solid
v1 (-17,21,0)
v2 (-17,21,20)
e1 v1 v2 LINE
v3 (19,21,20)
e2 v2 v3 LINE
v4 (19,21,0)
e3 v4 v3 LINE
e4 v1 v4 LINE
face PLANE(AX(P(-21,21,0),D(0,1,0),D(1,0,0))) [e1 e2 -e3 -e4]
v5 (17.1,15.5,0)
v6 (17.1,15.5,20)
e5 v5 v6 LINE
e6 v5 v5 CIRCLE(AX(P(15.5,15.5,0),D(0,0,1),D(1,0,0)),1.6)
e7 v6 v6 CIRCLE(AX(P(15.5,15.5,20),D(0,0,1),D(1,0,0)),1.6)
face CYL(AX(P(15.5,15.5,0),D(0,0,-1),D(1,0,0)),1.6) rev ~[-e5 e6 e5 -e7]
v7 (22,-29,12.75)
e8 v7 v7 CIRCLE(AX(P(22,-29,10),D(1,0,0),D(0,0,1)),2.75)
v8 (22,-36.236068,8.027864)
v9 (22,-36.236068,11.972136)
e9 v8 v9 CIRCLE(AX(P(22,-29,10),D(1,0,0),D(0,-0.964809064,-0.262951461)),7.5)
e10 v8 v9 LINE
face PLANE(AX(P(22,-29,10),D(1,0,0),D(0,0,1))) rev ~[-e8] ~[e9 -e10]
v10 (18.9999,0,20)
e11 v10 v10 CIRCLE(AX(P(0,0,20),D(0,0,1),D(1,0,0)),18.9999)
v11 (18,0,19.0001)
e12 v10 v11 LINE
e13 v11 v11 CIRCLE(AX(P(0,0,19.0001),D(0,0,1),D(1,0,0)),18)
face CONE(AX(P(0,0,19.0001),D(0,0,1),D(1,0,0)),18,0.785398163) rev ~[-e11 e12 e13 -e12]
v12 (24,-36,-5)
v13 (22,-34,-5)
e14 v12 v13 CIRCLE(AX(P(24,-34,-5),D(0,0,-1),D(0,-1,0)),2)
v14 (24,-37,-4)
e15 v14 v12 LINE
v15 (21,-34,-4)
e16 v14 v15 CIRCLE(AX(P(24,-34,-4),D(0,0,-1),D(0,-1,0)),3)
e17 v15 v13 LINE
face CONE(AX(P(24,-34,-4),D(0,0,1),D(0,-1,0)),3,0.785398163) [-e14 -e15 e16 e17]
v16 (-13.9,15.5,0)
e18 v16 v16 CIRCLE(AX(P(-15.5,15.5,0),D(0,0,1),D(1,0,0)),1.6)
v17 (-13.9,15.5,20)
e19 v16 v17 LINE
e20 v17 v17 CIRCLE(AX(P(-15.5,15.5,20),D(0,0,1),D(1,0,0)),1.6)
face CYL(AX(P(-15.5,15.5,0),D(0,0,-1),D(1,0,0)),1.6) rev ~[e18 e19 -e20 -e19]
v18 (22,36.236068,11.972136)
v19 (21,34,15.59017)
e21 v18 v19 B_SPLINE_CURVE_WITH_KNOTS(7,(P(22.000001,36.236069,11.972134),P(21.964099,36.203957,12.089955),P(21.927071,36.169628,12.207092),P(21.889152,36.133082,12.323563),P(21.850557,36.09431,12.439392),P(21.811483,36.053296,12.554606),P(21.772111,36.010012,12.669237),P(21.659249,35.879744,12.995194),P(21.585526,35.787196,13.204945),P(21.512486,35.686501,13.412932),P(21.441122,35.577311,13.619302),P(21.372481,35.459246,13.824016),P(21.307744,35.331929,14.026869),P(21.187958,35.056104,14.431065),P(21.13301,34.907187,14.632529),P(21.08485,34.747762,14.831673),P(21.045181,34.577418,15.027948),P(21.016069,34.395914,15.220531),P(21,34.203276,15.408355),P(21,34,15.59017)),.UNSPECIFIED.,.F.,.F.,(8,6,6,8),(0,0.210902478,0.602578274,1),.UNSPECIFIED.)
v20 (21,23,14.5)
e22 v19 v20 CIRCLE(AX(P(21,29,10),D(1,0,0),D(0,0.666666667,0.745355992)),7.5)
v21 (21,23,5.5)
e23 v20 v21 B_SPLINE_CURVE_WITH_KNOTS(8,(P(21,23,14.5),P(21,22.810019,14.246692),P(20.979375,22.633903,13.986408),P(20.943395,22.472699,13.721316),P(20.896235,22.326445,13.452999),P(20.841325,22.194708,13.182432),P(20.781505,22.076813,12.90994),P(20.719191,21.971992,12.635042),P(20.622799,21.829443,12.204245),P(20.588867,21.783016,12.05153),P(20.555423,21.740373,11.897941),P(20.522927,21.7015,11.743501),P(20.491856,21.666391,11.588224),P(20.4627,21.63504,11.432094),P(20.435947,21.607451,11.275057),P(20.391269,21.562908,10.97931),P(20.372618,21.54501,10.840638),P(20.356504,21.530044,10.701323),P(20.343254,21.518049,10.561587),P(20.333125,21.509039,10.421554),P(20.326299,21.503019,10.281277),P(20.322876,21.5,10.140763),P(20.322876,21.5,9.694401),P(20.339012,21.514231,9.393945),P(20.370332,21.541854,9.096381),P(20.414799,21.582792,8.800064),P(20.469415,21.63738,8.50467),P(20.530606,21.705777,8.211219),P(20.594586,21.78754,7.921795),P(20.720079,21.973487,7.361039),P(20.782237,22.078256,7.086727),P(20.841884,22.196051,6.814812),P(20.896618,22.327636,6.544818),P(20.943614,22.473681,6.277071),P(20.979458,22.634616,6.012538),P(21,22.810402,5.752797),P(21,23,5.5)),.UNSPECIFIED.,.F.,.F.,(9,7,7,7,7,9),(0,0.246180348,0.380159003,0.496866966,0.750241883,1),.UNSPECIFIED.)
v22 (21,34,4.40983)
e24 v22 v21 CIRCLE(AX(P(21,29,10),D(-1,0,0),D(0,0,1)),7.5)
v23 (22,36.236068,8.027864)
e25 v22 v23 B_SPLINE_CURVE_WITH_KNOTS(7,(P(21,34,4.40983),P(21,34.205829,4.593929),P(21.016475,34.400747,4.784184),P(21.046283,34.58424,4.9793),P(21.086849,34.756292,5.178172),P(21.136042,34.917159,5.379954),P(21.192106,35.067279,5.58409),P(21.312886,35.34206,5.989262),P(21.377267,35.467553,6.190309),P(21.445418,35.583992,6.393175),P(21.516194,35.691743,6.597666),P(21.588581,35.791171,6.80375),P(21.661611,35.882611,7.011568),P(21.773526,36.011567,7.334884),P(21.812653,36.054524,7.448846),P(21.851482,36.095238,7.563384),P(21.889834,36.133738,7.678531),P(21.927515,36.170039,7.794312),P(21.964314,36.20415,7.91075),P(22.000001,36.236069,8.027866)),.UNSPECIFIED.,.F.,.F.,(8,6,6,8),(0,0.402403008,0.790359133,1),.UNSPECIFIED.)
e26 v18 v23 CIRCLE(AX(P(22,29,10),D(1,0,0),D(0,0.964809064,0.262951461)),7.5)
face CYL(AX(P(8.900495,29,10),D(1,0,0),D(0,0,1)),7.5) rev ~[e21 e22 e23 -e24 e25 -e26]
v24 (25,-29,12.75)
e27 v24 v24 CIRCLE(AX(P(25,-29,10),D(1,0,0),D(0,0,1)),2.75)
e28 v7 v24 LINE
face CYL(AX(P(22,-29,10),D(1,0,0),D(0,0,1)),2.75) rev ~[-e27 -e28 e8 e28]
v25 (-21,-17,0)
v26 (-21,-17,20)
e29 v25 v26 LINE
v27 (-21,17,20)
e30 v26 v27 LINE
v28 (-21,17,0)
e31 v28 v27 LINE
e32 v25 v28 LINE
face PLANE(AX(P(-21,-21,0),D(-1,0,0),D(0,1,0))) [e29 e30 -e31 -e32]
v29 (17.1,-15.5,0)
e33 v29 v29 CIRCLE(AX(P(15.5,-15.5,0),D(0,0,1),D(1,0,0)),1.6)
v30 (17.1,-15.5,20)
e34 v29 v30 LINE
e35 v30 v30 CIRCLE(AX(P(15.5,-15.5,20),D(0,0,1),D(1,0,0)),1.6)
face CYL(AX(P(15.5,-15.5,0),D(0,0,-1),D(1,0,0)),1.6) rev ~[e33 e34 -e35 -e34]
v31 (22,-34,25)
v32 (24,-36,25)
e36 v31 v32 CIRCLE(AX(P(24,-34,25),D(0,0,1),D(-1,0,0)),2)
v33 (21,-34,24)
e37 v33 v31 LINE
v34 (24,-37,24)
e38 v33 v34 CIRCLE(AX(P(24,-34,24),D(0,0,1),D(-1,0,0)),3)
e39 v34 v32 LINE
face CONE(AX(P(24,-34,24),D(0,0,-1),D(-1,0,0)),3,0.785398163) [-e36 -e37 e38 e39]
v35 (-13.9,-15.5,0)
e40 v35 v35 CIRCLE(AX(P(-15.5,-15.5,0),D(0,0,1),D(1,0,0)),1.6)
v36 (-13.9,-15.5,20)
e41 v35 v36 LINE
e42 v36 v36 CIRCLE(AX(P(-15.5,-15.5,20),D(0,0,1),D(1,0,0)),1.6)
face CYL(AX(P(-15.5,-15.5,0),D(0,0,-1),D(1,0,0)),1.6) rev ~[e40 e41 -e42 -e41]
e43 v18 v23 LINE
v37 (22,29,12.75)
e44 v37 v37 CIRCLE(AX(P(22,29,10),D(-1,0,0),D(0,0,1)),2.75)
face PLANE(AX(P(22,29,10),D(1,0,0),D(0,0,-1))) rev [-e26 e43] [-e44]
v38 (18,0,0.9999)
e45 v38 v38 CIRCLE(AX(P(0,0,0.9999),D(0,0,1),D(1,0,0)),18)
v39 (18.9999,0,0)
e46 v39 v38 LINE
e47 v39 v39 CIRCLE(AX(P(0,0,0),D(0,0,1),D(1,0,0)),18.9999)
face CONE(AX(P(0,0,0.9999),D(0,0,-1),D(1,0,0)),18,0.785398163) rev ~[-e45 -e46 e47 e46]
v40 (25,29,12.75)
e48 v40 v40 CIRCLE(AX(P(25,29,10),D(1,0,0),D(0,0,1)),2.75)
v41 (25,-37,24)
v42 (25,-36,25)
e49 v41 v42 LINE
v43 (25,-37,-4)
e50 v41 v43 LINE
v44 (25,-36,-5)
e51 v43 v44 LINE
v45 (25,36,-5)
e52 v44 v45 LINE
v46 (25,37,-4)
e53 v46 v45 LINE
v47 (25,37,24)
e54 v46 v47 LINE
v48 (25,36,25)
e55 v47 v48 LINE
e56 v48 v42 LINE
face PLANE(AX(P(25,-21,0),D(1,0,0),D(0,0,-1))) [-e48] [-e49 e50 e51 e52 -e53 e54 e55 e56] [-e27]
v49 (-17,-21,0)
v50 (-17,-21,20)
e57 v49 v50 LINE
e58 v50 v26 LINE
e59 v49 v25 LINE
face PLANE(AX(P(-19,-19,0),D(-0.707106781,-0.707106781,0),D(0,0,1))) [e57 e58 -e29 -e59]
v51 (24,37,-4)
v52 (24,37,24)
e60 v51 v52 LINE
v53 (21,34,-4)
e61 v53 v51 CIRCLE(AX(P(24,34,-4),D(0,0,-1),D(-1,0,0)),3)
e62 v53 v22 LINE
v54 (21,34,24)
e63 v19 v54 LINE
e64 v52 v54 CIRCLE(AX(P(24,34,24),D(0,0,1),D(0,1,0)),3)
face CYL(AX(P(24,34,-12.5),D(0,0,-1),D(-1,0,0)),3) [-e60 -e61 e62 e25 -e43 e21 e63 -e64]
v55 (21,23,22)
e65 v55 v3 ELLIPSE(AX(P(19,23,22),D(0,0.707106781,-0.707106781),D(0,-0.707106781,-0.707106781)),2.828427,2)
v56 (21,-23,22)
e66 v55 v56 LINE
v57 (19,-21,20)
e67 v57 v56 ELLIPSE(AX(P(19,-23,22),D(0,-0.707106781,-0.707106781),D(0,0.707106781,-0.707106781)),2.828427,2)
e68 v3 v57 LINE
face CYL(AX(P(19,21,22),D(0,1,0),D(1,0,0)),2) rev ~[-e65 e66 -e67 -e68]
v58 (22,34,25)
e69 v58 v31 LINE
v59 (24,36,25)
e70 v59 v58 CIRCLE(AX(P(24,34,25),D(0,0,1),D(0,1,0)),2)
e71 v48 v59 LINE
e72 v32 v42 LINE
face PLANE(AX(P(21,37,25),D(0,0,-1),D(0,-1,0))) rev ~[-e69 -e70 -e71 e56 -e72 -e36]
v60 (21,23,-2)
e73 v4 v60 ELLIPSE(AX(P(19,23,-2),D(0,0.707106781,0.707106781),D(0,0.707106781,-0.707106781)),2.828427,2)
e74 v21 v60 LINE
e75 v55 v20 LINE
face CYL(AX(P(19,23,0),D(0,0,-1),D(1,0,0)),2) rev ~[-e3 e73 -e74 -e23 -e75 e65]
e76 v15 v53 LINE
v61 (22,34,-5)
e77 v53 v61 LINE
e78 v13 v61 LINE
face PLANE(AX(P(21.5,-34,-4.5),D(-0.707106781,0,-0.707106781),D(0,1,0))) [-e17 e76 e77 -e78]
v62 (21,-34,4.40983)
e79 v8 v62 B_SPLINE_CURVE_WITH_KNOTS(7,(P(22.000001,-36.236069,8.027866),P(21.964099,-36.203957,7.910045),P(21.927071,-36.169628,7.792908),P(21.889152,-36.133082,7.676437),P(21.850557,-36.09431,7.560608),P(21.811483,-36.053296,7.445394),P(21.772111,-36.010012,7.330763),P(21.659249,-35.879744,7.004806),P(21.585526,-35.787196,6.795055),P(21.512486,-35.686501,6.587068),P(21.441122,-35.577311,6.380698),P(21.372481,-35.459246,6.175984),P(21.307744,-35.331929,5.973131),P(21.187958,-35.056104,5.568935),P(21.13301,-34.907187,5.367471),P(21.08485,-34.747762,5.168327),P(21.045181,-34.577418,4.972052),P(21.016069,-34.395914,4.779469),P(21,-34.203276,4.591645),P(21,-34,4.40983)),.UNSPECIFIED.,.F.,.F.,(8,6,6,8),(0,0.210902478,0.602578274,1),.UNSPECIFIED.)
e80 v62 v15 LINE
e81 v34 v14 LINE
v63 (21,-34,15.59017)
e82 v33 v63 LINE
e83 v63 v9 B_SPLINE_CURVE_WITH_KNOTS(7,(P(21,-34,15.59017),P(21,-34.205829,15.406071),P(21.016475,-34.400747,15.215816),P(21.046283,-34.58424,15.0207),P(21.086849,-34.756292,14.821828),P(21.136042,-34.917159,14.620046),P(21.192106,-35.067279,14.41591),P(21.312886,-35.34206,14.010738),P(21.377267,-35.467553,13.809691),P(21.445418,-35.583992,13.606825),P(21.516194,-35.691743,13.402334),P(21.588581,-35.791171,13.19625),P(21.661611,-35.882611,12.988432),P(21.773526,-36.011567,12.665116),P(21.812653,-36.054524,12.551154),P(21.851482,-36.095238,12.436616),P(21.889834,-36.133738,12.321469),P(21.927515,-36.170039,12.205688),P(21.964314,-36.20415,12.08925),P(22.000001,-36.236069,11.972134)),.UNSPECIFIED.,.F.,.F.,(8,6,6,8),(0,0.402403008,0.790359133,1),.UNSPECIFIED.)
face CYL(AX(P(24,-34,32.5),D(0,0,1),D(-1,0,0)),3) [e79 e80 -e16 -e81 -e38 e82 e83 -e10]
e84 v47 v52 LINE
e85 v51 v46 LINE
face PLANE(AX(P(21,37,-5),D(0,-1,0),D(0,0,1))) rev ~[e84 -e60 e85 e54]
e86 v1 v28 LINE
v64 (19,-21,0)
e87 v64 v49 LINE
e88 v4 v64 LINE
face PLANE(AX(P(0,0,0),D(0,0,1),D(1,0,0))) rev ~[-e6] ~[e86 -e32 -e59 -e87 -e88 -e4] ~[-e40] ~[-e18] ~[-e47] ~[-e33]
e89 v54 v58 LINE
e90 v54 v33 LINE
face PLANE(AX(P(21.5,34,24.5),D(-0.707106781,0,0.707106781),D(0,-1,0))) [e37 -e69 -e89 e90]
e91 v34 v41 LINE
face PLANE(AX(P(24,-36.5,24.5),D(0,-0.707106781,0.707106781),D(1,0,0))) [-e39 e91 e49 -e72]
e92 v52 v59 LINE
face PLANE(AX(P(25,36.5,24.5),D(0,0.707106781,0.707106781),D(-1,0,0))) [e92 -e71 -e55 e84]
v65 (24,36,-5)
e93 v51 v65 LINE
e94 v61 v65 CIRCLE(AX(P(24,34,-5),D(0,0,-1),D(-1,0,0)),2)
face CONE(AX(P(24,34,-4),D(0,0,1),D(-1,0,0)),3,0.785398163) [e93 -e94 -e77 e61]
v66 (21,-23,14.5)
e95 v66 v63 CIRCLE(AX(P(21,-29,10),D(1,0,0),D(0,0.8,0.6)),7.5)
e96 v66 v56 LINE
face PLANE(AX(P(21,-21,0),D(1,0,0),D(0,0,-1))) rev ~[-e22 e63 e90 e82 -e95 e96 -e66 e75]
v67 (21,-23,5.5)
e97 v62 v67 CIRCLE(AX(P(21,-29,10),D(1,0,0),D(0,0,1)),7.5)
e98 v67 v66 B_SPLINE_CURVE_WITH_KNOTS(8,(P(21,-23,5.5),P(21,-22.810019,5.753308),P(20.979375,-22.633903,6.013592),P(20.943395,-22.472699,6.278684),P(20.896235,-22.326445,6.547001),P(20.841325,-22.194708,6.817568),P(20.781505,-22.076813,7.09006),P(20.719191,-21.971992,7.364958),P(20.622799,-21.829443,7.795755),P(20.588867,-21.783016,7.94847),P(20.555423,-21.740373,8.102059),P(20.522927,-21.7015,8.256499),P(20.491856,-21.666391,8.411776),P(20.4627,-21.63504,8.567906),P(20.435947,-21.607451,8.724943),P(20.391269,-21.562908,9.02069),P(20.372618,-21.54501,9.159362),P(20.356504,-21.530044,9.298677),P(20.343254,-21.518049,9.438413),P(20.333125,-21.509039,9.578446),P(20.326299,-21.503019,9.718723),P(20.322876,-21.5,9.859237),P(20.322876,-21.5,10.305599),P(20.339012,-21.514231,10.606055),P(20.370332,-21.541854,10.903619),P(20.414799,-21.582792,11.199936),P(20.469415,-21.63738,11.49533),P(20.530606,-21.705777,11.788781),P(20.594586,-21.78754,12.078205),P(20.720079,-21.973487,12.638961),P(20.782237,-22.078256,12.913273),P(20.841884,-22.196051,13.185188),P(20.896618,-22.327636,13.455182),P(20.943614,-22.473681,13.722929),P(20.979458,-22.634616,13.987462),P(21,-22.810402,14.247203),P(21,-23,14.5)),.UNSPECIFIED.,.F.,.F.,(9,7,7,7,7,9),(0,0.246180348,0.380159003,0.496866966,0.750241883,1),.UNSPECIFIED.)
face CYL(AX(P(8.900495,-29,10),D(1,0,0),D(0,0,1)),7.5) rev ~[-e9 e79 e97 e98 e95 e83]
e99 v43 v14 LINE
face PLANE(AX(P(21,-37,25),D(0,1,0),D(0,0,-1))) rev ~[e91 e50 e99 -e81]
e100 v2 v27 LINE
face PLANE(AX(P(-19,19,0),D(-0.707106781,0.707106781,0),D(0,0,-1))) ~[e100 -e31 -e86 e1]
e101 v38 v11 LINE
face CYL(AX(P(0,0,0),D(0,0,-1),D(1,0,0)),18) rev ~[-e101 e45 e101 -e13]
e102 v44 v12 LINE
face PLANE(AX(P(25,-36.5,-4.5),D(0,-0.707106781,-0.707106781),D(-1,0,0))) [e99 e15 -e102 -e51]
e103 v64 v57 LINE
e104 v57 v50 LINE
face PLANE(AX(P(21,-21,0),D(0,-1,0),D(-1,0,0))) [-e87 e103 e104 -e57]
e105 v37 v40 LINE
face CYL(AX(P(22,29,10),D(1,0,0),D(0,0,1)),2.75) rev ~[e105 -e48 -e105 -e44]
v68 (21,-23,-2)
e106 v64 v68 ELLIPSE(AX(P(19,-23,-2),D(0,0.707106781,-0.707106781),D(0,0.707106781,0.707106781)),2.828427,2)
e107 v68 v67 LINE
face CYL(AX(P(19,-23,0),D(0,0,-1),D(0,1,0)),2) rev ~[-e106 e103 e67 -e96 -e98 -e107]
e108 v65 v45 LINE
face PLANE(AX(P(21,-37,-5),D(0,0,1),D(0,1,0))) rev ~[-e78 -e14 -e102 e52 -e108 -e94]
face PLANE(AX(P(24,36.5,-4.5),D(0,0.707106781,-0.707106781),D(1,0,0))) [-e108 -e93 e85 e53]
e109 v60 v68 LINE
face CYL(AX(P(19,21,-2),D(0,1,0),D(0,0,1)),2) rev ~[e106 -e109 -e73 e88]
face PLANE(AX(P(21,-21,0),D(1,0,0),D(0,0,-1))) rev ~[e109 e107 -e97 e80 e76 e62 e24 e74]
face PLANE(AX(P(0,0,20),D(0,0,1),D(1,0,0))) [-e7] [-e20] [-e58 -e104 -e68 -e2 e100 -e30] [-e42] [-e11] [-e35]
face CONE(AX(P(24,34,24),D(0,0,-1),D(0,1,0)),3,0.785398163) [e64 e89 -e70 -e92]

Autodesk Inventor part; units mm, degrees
ref_plane "YZ Plane" through (0, 0, 0) normal (1, 0, 0) x (0, 1, 0)
ref_plane "XZ Plane" through (0, 0, 0) normal (0, 1, 0) x (-1, 0, 0)
ref_plane "XY Plane" through (0, 0, 0) normal (0, 0, 1) x (1, 0, 0)
sketch "Skizze1" plane through (0, 0, 0) normal (0, 0, 1) x (1, 0, 0)
  line L0 (21, -21) -> (-21, -21)
  line L1 (-21, -21) -> (-21, 21)
  line L2 (-21, 21) -> (21, 21)
  line L3 (21, 21) -> (21, -21)
  line L4 (21, -21) -> (-21, 21) construction
  line L5 (-21, -21) -> (21, 21) construction
  circle A0 centre (0, 0) radius 18
  circle A1 centre (-15.5, 15.5) radius 1.6
  circle A2 centre (15.5, 15.5) radius 1.6
  circle A3 centre (15.5, -15.5) radius 1.6
  circle A4 centre (-15.5, -15.5) radius 1.6
  dimension "d0" = 42
  dimension "d1" = 42
  dimension "d2" = 36
  dimension "d3" = 31
  dimension "d4" = 15.5
  dimension "d5" = 3.2
  dimension "d6" = 3.2
  dimension "d7" = 3.2
  dimension "d8" = 3.2
extrude "Extrusion1" add sketch "Skizze1" along normal blind 20
sketch "Skizze2" plane through (21, -21, 0) normal (1, 0, 0) x (0, 0, -1)
  line L0 (-25, -16) -> (5, -16)
  line L1 (5, -16) -> (5, 58)
  line L2 (5, 58) -> (-25, 58)
  line L3 (-25, 58) -> (-25, -16)
  line L4 (-25, -16) -> (5, 58) construction
  line L5 (5, -16) -> (-25, 58) construction
  line L6 (0, 0) -> (-20, 0) projected
  line L7 (0, 42) -> (-20, 42) projected
  line L8 (0, 42) -> (0, 0) projected
  point P0 (0, 21)
  point P1 (-10, 21)
  point P2 (0, 21)
  dimension "d11" = 30
  dimension "d12" = 74
  dimension "d13" = 42
  dimension "d14" = 20
  dimension "d15" = 10
  dimension "d16" = 21
extrude "Extrusion2" add sketch "Skizze2" along normal blind 4
sketch "Skizze3" plane through (21, -21, 0) normal (-1, 0, 0) x (0, 0, 1)
  line L0 (0, 0) -> (20, 0) projected
  line L1 (25, -16) -> (-5, -16) projected
  line L2 (25, 58) -> (25, -16) projected
  point P0 (0, 21)
  point P1 (10, -8)
  dimension "d19" = 16
  dimension "d20" = 15
  dimension "d21" = 30
  dimension "d22" = 8
hole "Bohrung1" at (21, -29, 10) direction (1, 0, 0) diameter 5.5 end through all counterbore diameter 15 counterbore depth 1 clearance for "Sechskantkopfschraube DIN EN 24017" size "M5" standard "DIN"
ref_plane "Arbeitsebene1" through (21, 0, -5) normal (0, -1, 0) x (0, 0, -1)
mirror "Spiegeln1" about plane through (21, 0, -5) normal (0, -1, 0) of "Bohrung1"
chamfer "Fase1" distance 4 angle 45 2 edges at (-21, -21, 10) (-21, 21, 10)
fillet "Rundung1" radius 2 4 edges at (21, 0, 20) (21, -21, 10) (21, 21, 10) (21, 0, 0)
fillet "Rundung2" radius 3 2 edges at (21, -37, 10) (21, 37, 10)
chamfer "Fase2" distance 1 angle 45 10 edges at (21, 0, 25) (21.8787, -36.1213, 25) (24.5, -37, 25) (21.8787, 36.1213, 25) (24.5, 37, 25) (21, 0, -5) (21.8787, 36.1213, -5) (24.5, 37, -5) (21.8787, -36.1213, -5) (24.5, -37, -5)
chamfer "Fase3" distance 1 angle 45 2 edges at (-18, 0, 20) (-18, 0, 0)
equation "\"d1\" = d0"
equation "\"d6\" = d5"
equation "\"d15\" = 0.5 * d14"
equation "\"d20\" = 0.5 * d21"
equation "\"d22\" = 0.5 * d19"
properties part number "bullog_mount"
